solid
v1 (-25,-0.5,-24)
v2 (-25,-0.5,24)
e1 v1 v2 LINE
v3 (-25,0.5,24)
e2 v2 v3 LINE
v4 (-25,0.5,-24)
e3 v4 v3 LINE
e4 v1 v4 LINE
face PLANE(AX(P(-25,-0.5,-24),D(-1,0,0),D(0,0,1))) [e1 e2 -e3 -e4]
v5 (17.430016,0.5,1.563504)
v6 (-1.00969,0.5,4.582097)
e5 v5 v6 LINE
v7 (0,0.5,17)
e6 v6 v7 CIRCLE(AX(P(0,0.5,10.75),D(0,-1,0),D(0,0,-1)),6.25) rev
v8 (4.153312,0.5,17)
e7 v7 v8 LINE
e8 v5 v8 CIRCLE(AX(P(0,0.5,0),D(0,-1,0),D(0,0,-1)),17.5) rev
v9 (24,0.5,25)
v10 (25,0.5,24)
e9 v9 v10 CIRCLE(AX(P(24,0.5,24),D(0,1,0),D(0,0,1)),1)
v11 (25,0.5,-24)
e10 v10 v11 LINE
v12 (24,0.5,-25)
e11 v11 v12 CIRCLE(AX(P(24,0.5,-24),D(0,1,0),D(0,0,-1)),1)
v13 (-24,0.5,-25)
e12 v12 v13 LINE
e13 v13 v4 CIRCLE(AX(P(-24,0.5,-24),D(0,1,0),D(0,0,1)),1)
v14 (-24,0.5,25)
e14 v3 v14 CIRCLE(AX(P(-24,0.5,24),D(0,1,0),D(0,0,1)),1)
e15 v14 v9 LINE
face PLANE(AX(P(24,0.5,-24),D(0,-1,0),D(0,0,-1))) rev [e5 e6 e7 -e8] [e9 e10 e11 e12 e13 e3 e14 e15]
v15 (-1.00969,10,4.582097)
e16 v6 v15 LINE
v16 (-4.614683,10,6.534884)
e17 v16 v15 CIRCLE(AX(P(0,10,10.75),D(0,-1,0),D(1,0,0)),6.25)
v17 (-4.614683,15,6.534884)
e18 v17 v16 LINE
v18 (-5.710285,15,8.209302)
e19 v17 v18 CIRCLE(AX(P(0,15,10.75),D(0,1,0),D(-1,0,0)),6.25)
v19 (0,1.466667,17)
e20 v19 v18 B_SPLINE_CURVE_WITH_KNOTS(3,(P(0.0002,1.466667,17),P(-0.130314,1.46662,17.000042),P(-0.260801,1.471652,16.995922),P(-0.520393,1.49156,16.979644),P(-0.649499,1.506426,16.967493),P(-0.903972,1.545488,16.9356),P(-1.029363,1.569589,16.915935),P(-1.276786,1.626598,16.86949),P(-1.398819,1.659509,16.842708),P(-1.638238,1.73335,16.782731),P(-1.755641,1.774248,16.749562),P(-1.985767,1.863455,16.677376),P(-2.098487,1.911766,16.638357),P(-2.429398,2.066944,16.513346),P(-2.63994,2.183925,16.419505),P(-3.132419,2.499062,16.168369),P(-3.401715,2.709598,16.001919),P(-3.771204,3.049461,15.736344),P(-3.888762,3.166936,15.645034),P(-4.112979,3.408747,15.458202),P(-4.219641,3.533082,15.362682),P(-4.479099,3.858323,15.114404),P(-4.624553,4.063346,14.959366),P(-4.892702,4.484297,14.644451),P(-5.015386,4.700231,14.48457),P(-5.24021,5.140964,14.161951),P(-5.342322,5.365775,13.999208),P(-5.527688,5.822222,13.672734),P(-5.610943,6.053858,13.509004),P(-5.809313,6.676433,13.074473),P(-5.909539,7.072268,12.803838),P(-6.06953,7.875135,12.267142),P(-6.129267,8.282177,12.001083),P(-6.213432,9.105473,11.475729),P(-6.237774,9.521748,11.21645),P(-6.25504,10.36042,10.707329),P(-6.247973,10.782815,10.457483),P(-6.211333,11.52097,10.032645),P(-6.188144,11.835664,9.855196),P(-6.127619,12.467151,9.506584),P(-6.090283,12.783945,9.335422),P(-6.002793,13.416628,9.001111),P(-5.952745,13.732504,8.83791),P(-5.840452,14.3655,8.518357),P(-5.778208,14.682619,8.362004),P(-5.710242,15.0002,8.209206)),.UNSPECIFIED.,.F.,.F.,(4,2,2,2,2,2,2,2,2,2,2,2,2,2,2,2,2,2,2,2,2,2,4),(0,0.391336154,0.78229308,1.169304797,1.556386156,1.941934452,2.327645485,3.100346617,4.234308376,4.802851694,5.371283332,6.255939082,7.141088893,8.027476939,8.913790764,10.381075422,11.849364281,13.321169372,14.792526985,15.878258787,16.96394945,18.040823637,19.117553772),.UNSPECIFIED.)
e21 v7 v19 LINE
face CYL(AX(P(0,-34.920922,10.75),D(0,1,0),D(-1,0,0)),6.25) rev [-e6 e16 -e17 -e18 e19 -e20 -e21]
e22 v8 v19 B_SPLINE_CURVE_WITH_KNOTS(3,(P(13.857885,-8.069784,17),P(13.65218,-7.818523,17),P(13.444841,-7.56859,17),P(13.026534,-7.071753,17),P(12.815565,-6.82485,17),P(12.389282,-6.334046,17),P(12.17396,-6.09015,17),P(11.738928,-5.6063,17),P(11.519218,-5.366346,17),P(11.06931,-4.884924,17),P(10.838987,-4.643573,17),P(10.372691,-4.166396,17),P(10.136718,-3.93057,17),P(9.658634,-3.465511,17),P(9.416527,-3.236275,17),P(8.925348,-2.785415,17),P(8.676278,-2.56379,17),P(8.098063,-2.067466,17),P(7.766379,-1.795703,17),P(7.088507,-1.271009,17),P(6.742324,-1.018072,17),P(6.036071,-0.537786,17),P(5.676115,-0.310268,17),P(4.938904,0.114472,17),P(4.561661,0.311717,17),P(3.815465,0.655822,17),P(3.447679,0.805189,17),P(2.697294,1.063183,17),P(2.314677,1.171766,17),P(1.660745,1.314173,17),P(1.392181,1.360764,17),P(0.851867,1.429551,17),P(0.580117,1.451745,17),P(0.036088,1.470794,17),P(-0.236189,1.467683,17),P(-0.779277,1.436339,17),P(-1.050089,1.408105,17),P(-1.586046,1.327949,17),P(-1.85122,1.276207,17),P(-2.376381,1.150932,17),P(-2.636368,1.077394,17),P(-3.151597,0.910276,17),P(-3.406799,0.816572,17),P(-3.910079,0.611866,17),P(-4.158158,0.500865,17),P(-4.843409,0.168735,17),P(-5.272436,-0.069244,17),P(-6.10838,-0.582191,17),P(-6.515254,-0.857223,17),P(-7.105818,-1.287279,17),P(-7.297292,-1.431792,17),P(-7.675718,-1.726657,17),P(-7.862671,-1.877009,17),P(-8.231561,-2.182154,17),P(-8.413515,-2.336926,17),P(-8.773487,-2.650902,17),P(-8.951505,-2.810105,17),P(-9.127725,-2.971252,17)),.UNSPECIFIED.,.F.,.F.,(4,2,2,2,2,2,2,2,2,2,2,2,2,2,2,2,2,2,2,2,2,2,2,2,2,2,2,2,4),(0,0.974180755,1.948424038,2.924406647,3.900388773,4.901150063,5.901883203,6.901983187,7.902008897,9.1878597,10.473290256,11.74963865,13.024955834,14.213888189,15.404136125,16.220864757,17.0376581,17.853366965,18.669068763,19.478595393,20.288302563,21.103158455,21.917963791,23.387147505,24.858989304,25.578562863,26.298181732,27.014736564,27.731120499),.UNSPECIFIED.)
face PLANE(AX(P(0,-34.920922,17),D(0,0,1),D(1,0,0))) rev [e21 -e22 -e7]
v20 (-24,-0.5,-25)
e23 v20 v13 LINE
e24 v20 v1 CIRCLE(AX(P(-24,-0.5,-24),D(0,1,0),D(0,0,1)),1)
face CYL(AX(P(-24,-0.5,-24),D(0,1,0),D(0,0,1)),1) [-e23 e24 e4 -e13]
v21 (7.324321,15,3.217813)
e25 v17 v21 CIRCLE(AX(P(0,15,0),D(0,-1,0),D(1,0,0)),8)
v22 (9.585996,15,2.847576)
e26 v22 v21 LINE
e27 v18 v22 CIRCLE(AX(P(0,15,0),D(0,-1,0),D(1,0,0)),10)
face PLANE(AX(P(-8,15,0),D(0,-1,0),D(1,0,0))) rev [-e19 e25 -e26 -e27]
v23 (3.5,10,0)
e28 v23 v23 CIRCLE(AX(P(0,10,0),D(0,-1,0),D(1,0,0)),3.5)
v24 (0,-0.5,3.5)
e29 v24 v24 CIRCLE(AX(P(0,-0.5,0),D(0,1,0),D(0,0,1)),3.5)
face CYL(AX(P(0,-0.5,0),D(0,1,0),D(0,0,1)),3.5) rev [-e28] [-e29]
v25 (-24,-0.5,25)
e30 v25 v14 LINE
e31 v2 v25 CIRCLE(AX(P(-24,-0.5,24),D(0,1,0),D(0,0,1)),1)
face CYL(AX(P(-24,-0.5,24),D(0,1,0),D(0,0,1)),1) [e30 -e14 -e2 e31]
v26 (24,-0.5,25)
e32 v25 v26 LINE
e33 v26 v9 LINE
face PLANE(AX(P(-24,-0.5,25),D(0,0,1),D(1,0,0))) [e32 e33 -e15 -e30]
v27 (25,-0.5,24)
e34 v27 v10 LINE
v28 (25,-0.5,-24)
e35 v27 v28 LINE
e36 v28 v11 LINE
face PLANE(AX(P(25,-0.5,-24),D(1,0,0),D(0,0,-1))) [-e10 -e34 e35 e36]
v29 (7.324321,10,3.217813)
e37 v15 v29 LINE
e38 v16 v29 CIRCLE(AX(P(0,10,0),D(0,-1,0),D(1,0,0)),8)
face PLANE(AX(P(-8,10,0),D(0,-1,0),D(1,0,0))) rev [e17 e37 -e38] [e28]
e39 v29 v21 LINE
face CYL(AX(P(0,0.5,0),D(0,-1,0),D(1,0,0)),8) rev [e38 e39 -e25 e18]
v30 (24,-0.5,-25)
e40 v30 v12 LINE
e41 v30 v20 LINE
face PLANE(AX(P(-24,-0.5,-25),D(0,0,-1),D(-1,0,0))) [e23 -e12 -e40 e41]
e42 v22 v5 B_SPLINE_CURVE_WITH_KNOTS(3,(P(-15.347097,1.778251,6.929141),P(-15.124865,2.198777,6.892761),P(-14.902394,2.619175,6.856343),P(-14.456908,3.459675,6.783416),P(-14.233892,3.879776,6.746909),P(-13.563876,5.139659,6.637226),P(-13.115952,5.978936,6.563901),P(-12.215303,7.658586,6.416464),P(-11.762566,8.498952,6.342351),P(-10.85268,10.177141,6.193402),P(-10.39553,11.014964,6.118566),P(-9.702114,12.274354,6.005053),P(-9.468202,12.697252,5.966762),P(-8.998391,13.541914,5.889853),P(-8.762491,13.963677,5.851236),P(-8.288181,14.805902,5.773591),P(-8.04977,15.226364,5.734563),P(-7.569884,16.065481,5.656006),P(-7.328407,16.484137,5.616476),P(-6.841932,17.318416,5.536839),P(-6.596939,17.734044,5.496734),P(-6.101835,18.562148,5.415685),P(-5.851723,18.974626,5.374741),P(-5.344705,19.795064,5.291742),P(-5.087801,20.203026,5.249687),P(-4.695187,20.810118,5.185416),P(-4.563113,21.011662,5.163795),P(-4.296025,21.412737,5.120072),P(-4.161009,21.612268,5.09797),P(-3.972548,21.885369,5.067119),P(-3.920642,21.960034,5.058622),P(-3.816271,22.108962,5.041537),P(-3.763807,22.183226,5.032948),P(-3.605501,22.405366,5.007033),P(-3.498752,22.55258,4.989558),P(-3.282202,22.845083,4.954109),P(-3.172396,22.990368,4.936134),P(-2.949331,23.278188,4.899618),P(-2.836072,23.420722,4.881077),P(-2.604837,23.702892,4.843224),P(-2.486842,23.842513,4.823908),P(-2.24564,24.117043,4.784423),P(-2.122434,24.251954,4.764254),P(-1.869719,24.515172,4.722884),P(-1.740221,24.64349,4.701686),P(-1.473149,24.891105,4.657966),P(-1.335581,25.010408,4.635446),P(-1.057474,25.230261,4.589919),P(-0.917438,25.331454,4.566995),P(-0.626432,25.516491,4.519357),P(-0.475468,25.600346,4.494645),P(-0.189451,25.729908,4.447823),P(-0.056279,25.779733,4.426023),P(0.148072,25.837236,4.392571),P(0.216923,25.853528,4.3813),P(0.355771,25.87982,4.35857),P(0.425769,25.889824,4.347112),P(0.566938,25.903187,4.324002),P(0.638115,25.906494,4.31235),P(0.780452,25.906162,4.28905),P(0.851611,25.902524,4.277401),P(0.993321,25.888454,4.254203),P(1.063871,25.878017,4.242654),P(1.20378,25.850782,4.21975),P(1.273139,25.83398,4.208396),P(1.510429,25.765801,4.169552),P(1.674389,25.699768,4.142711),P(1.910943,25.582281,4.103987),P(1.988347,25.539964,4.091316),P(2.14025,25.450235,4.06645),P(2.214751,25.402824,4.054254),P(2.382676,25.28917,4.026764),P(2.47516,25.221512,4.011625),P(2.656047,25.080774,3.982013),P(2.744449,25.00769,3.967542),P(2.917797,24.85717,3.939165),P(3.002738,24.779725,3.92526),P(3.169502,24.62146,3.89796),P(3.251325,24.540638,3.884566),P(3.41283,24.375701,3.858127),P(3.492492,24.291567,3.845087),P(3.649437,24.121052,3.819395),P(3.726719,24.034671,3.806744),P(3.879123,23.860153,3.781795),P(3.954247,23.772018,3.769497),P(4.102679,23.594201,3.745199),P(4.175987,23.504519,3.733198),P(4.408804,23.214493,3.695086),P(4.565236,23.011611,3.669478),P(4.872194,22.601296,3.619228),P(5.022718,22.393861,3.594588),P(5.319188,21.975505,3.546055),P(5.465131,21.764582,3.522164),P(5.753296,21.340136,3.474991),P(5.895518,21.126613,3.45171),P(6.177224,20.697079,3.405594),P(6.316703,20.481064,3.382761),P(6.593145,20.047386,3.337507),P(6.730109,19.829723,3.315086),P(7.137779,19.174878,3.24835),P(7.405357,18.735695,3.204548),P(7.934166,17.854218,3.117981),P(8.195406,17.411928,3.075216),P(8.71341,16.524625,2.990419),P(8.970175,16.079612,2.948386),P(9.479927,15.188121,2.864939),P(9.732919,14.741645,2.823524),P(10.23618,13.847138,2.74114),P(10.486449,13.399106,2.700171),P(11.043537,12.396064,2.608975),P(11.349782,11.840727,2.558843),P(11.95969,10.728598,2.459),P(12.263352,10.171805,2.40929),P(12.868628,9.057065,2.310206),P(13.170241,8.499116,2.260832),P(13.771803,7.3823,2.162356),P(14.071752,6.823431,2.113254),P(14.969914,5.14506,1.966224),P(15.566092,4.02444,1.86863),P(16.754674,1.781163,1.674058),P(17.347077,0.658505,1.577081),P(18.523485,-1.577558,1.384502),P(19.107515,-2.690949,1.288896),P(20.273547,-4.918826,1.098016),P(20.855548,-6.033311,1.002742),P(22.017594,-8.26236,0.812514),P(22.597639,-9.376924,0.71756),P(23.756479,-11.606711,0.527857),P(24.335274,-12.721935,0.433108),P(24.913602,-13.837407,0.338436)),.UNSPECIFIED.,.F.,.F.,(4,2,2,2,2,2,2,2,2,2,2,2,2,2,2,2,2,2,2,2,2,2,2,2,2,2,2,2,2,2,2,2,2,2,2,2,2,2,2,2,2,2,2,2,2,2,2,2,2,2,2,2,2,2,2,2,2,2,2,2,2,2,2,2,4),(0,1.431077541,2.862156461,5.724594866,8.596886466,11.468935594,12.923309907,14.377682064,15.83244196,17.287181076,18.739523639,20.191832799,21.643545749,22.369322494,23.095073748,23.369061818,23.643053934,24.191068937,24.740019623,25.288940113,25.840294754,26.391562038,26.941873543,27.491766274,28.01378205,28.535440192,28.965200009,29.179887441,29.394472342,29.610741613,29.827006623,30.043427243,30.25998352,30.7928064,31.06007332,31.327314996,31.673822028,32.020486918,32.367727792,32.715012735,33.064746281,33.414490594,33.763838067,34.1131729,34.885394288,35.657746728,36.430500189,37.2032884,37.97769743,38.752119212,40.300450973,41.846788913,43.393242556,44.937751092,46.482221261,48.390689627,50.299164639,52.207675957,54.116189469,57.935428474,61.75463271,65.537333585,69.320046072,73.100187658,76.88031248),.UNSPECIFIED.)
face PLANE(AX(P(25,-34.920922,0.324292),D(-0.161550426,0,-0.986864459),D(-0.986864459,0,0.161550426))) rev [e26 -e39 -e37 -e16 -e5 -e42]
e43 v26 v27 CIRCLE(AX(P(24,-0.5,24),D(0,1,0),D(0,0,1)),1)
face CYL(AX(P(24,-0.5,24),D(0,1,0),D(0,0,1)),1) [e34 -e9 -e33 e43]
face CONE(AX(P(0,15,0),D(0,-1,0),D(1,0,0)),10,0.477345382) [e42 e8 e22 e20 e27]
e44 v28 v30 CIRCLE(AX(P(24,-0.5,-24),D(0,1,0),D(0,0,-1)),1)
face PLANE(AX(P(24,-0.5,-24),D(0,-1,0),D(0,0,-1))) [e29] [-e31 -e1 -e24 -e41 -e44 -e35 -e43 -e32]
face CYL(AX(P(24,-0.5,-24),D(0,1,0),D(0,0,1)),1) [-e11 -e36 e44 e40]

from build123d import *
from build123d.topology import SkipClean

# Parameters (mm, degrees)
BOSS_EXTRUDE1_DEPTH      = 0.5
BOSS_EXTRUDE1_DEPTH_BACK = 0.5
SKETCH1_R                = 3.5
CUT_EXTRUDE1_DEPTH       = 14.5


with BuildPart() as part:
    # Sketch1 → Boss-Extrude1 (new, two sides: drawn at the far end of the back side and taken through both)
    with BuildSketch(Plane(origin=(0, 0, 0), x_dir=(1, 0, 0), z_dir=(0, 1, 0)).offset(-BOSS_EXTRUDE1_DEPTH_BACK)):
        with BuildLine():
            Line((-24, 25), (24, 25))
            ThreePointArc((24, 25), (24.707106781, 24.707106781), (25, 24))
            Line((25, 24), (25, -24))
            ThreePointArc((25, -24), (24.707106781, -24.707106781), (24, -25))
            Line((24, -25), (-24, -25))
            ThreePointArc((-24, -25), (-24.707106781, -24.707106781), (-25, -24))
            Line((-25, -24), (-25, 24))
            ThreePointArc((-25, 24), (-24.707106781, 24.707106781), (-24, 25))
        make_face()
        with Locations(Location((0, 0, 0), (0, 0, 270))):
            Circle(SKETCH1_R, mode=Mode.SUBTRACT)
    extrude(amount=BOSS_EXTRUDE1_DEPTH + BOSS_EXTRUDE1_DEPTH_BACK)

    # Sketch2 → Revolve1 (revolve)
    with SkipClean():  # the faces are left unmerged after this step: merging them gives an invalid solid
        with BuildSketch(Plane.XY, mode=Mode.PRIVATE) as revolve1_sk:
            Polygon((-8, 15), (-10, 15), (-17.5, 0.5), (-3.5, 0.5), (-3.5, 10), (-8, 10), align=None)
        revolve(revolve1_sk.sketch.rotate(Axis((0, 0.5, 0), (0, 1, 0)), 180), axis=Axis((0, 0.5, 0), (0, 1, 0)))
    add(part.part.scale(1), mode=Mode.REPLACE)  # the faces are merged on a copy

    # Sketch4 → Cut-Extrude1 (cut)
    with BuildSketch(Plane(origin=(0, 15, 0), x_dir=(1, 0, 0), z_dir=(0, 1, 0))):
        with BuildLine():
            Line((25, -0.324292046), (-1.009690159, -4.582097133))
            ThreePointArc((-1.009690159, -4.582097133), (-6.229441906, -11.256511144), (0, -17))
            Line((0, -17), (25, -17))
            Line((25, -17), (25, -7.125))
            Line((25, -7.125), (25, -0.324292046))
        make_face()
    extrude(amount=-CUT_EXTRUDE1_DEPTH, mode=Mode.SUBTRACT)


solid = part.part
